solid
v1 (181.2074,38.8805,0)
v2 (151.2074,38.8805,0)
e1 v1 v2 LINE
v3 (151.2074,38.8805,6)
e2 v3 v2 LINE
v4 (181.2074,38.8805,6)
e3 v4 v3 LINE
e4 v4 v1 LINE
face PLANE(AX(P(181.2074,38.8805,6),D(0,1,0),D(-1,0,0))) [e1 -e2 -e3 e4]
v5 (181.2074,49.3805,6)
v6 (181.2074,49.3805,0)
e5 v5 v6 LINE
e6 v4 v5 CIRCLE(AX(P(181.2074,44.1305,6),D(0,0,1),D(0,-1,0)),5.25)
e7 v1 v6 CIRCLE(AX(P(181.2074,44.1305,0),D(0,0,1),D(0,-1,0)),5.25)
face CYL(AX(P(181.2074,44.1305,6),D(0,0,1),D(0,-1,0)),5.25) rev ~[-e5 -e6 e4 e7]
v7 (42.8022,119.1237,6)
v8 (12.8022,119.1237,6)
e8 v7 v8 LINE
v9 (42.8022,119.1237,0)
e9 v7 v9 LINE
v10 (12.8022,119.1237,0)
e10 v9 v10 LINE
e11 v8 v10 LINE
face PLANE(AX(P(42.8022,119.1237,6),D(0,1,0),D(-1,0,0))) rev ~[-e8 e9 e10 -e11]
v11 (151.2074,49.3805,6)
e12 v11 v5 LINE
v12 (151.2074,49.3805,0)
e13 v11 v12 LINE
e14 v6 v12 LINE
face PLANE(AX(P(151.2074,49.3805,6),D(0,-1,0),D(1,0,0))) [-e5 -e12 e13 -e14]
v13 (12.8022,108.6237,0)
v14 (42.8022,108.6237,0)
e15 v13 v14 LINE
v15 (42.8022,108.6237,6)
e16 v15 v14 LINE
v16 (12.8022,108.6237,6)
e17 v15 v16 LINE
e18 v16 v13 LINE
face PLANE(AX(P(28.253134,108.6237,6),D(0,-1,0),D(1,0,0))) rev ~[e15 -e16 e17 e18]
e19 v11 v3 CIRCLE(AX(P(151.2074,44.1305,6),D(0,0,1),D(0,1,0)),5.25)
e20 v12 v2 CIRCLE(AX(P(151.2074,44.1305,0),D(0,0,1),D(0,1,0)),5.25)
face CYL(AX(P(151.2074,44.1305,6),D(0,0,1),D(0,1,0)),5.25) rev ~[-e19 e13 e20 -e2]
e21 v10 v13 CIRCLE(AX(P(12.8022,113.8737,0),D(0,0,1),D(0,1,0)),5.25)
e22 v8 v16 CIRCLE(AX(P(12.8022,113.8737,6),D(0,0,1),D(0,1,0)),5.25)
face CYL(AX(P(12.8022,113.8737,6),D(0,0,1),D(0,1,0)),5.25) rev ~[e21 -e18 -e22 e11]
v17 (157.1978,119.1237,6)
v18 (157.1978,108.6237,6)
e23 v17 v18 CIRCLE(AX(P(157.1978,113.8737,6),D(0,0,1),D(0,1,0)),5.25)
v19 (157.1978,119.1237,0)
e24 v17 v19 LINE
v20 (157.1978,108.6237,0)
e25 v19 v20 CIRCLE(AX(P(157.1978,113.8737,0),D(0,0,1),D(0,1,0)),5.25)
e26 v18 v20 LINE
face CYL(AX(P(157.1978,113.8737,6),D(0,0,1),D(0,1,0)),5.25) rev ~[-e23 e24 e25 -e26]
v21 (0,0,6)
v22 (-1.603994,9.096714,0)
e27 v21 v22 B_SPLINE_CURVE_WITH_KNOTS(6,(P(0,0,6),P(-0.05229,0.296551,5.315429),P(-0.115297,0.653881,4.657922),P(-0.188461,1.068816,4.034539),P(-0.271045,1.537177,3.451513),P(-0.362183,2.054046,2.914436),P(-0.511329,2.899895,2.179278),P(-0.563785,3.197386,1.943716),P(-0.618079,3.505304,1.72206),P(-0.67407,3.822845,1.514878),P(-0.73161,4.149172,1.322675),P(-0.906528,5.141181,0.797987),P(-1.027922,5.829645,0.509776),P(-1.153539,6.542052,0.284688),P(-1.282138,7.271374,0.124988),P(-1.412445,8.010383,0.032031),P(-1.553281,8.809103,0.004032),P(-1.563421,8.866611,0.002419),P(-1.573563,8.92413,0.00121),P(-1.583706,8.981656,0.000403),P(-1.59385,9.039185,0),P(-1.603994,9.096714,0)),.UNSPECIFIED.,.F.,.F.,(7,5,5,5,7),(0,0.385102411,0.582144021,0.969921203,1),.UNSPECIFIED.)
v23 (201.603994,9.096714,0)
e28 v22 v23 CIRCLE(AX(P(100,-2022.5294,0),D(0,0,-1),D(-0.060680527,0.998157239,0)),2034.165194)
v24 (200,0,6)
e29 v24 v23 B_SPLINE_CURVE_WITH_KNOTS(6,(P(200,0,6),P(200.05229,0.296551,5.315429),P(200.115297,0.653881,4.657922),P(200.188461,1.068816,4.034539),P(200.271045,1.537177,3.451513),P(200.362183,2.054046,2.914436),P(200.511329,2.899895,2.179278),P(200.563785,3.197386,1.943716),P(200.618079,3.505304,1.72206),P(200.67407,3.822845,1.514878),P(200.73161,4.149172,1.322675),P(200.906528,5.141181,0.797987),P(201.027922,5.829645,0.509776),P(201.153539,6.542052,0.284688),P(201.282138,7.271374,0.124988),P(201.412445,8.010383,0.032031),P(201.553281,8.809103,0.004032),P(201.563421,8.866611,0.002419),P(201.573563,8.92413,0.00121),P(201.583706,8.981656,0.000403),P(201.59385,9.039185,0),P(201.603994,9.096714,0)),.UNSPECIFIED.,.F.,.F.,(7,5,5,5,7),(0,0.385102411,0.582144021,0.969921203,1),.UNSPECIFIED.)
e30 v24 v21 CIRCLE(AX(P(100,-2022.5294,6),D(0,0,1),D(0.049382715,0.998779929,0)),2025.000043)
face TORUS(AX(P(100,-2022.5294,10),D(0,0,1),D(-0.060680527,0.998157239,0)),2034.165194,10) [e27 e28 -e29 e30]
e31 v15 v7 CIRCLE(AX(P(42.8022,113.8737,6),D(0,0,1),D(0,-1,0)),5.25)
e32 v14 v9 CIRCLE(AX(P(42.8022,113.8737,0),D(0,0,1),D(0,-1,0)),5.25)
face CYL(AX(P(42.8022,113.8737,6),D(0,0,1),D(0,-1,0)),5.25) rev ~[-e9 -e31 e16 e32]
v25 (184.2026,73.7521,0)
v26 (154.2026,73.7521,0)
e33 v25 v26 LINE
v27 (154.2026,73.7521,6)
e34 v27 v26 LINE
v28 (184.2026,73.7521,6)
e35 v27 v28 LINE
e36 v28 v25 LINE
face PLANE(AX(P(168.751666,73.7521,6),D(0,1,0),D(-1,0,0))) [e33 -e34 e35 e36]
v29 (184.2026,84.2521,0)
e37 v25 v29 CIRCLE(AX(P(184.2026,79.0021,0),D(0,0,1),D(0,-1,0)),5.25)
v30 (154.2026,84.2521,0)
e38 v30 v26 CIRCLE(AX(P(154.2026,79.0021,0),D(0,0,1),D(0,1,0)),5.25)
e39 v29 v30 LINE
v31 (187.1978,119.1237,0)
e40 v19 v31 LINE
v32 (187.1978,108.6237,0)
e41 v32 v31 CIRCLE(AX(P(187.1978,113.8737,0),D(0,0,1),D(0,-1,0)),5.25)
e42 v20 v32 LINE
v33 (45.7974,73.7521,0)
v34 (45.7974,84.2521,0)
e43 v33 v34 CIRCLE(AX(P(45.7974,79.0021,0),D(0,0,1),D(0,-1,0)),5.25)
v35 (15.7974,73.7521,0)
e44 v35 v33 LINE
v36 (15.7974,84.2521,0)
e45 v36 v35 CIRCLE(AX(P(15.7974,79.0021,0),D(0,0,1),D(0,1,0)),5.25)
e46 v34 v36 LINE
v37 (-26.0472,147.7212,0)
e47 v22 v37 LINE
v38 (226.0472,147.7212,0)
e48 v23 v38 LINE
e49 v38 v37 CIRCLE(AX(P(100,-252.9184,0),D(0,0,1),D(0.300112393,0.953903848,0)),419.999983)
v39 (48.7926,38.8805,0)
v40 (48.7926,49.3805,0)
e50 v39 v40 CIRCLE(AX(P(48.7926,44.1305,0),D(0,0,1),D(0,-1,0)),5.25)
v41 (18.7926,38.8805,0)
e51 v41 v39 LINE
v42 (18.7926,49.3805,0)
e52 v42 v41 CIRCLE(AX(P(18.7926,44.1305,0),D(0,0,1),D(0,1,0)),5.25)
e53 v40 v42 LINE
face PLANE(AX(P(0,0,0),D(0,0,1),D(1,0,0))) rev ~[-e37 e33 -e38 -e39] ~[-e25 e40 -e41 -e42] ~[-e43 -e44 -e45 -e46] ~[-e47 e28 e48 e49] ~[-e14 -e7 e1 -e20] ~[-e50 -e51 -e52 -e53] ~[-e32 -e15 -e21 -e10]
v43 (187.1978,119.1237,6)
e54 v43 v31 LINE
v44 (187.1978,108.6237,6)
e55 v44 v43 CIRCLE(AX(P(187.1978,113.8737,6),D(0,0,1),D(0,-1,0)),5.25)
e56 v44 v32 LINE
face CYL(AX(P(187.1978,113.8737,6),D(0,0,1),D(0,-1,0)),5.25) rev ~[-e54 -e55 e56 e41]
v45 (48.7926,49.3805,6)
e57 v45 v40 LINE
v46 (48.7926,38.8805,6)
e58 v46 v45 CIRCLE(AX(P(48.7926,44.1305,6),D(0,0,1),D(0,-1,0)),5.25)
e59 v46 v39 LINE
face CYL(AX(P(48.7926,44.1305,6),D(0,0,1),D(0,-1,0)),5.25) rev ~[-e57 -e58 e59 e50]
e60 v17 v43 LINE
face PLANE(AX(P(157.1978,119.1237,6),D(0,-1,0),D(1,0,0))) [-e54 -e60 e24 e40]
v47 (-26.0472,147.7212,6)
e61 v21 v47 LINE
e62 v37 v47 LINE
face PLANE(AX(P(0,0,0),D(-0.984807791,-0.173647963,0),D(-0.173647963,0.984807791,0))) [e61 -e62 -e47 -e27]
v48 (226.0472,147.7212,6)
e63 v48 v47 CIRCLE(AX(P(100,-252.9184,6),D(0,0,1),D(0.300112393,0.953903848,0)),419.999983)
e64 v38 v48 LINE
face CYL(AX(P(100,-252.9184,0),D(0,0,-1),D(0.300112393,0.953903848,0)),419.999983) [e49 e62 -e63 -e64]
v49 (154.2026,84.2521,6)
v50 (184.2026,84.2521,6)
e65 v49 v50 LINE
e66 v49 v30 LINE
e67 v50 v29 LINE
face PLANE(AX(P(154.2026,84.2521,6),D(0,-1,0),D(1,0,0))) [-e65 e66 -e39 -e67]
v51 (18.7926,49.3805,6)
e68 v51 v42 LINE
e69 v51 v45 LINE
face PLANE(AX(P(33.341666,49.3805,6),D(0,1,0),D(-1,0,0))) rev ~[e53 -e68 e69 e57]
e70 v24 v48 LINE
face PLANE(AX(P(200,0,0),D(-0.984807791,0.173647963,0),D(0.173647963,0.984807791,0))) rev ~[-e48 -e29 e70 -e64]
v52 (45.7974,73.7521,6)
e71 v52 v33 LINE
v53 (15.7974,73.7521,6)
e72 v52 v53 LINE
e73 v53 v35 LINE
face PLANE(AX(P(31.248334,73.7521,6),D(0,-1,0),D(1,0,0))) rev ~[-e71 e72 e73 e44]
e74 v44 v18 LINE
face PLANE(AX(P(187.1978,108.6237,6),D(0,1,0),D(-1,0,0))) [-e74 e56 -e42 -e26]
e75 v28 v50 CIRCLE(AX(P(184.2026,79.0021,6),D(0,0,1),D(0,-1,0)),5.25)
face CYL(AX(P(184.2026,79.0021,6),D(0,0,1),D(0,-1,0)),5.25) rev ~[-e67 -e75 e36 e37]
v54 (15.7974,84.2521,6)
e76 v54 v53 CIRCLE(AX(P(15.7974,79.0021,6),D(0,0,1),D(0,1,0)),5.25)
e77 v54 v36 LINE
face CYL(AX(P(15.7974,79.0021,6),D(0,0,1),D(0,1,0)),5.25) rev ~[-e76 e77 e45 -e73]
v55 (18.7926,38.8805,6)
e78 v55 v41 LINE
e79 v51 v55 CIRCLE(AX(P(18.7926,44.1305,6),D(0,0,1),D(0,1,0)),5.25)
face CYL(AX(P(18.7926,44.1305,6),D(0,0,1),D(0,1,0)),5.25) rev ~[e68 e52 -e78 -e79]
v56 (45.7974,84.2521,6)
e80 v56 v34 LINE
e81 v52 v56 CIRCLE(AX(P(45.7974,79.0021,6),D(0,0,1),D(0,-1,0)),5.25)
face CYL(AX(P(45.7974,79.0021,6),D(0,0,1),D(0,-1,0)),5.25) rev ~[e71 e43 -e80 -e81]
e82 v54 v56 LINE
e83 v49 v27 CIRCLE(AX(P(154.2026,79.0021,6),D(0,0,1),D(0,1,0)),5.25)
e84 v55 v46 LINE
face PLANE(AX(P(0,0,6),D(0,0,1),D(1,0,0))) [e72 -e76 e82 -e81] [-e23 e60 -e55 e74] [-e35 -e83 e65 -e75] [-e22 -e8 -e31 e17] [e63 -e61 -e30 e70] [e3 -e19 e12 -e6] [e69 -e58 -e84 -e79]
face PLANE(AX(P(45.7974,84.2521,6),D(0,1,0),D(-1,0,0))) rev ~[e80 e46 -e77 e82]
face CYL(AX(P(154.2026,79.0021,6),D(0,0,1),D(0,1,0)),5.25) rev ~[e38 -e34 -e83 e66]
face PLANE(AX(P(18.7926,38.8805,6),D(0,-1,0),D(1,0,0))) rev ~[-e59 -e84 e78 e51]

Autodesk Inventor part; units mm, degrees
ref_plane "YZ Plane" through (0, 0, 0) normal (1, 0, 0) x (0, 1, 0)
ref_plane "XZ Plane" through (0, 0, 0) normal (0, 1, 0) x (-1, 0, 0)
ref_plane "XY Plane" through (0, 0, 0) normal (0, 0, 1) x (1, 0, 0)
sketch "Sketch1" plane through (0, 0, 0) normal (0, 0, 1) x (1, 0, 0)
  line L0 (0, 0) -> (200, 0) construction
  arc A0 (200, 0) -> (0, 0) centre (100, -2022.5294) ccw
  line L1 (200, 0) -> (226.0472, 147.7212)
  line L2 (200, 0) -> (350, 0) construction
  line L3 (100, 2.4706) -> (100, 110.946)
  line L4 (0, 0) -> (-26.0472, 147.7212)
  arc A1 (226.0472, 147.7212) -> (-26.0472, 147.7212) centre (100, -252.9184) ccw
  dimension "d4" = 2025
  dimension "d5" = 150
  dimension "d6" = 80
  dimension "d7" = 420
  dimension "d20" = 200
extrude "Plate1" add sketch "Sketch1" along normal blind 6
sketch "Sketch2" plane through (0, 0, 6) normal (0, 0, 1) x (1, 0, 0)
  arc A0 (200, 0) -> (0, 0) centre (100, -2022.5294) ccw projected
  line L0 (100, 2.4706) -> (100, 167.0816)
  arc A1 (226.0472, 147.7212) -> (-26.0472, 147.7212) centre (100, -252.9184) ccw projected
  arc A2 (100, 2.4706) -> (0, 0) centre (100, -2022.5294) ccw
  arc A3 (100, 167.0816) -> (-26.0472, 147.7212) centre (100, -252.9184) ccw
  line L1 (45.7974, 79.0021) -> (15.7974, 79.0021) construction
  line L2 (45.7974, 84.2521) -> (15.7974, 84.2521)
  line L3 (15.7974, 73.7521) -> (45.7974, 73.7521)
  arc A4 (45.7974, 73.7521) -> (45.7974, 84.2521) centre (45.7974, 79.0021) ccw
  arc A5 (15.7974, 84.2521) -> (15.7974, 73.7521) centre (15.7974, 79.0021) ccw
  line L4 (30.7974, 79.0021) -> (27.8022, 113.8737)
  line L5 (30.7974, 79.0021) -> (33.7926, 44.1305)
  line L6 (18.7926, 44.1305) -> (48.7926, 44.1305) construction
  line L7 (18.7926, 38.8805) -> (48.7926, 38.8805)
  line L8 (48.7926, 49.3805) -> (18.7926, 49.3805)
  arc A6 (18.7926, 49.3805) -> (18.7926, 38.8805) centre (18.7926, 44.1305) ccw
  arc A7 (48.7926, 38.8805) -> (48.7926, 49.3805) centre (48.7926, 44.1305) ccw
  line L9 (33.7926, 44.1305) -> (63.7926, 44.1305) construction
  line L10 (12.8022, 113.8737) -> (42.8022, 113.8737) construction
  line L11 (12.8022, 108.6237) -> (42.8022, 108.6237)
  line L12 (42.8022, 119.1237) -> (12.8022, 119.1237)
  arc A8 (12.8022, 119.1237) -> (12.8022, 108.6237) centre (12.8022, 113.8737) ccw
  arc A9 (42.8022, 108.6237) -> (42.8022, 119.1237) centre (42.8022, 113.8737) ccw
  line L13 (154.2026, 79.0021) -> (184.2026, 79.0021) construction
  line L14 (154.2026, 84.2521) -> (184.2026, 84.2521)
  line L15 (184.2026, 73.7521) -> (154.2026, 73.7521)
  arc A10 (154.2026, 84.2521) -> (154.2026, 73.7521) centre (154.2026, 79.0021) ccw
  arc A11 (184.2026, 73.7521) -> (184.2026, 84.2521) centre (184.2026, 79.0021) ccw
  line L16 (169.2026, 79.0021) -> (172.1978, 113.8737)
  line L17 (169.2026, 79.0021) -> (166.2074, 44.1305)
  line L18 (181.2074, 44.1305) -> (151.2074, 44.1305) construction
  line L19 (181.2074, 38.8805) -> (151.2074, 38.8805)
  line L20 (151.2074, 49.3805) -> (181.2074, 49.3805)
  arc A12 (181.2074, 38.8805) -> (181.2074, 49.3805) centre (181.2074, 44.1305) ccw
  arc A13 (151.2074, 49.3805) -> (151.2074, 38.8805) centre (151.2074, 44.1305) ccw
  line L21 (187.1978, 113.8737) -> (157.1978, 113.8737) construction
  line L22 (187.1978, 108.6237) -> (157.1978, 108.6237)
  line L23 (157.1978, 119.1237) -> (187.1978, 119.1237)
  arc A14 (187.1978, 108.6237) -> (187.1978, 119.1237) centre (187.1978, 113.8737) ccw
  arc A15 (157.1978, 119.1237) -> (157.1978, 108.6237) centre (157.1978, 113.8737) ccw
  dimension "d9" = 15
  dimension "d10" = 10.5
  dimension "d11" = 35
  dimension "d12" = 35
  dimension "d13" = 15
  dimension "d14" = 0
  dimension "d15" = 10.5
  dimension "d16" = 15
  dimension "d17" = 10.5
extrude "Cut1" cut sketch "Sketch2" against normal blind 6
fillet "Fillet1" radius 10 1 edges at (100, 2.4706, 0)
equation "\"d18\" = Thickness"
equation "\"d8\" = Thickness"
equation "\"BendRadius\" = Thickness"
equation "\"BendReliefWidth\" = Thickness"
equation "\"BendReliefDepth\" = 0.5 * Thickness"
equation "\"CornerReliefSize\" = 4 * Thickness"
equation "\"MinimumRemnant\" = 2 * Thickness"
equation "\"TransitionRadius\" = BendRadius"
equation "\"JacobiRadiusSize\" = BendRadius"
equation "\"GapSize\" = Thickness"
equation "\"Thickness\" = 6"
properties part number "Double Shear Plate"
